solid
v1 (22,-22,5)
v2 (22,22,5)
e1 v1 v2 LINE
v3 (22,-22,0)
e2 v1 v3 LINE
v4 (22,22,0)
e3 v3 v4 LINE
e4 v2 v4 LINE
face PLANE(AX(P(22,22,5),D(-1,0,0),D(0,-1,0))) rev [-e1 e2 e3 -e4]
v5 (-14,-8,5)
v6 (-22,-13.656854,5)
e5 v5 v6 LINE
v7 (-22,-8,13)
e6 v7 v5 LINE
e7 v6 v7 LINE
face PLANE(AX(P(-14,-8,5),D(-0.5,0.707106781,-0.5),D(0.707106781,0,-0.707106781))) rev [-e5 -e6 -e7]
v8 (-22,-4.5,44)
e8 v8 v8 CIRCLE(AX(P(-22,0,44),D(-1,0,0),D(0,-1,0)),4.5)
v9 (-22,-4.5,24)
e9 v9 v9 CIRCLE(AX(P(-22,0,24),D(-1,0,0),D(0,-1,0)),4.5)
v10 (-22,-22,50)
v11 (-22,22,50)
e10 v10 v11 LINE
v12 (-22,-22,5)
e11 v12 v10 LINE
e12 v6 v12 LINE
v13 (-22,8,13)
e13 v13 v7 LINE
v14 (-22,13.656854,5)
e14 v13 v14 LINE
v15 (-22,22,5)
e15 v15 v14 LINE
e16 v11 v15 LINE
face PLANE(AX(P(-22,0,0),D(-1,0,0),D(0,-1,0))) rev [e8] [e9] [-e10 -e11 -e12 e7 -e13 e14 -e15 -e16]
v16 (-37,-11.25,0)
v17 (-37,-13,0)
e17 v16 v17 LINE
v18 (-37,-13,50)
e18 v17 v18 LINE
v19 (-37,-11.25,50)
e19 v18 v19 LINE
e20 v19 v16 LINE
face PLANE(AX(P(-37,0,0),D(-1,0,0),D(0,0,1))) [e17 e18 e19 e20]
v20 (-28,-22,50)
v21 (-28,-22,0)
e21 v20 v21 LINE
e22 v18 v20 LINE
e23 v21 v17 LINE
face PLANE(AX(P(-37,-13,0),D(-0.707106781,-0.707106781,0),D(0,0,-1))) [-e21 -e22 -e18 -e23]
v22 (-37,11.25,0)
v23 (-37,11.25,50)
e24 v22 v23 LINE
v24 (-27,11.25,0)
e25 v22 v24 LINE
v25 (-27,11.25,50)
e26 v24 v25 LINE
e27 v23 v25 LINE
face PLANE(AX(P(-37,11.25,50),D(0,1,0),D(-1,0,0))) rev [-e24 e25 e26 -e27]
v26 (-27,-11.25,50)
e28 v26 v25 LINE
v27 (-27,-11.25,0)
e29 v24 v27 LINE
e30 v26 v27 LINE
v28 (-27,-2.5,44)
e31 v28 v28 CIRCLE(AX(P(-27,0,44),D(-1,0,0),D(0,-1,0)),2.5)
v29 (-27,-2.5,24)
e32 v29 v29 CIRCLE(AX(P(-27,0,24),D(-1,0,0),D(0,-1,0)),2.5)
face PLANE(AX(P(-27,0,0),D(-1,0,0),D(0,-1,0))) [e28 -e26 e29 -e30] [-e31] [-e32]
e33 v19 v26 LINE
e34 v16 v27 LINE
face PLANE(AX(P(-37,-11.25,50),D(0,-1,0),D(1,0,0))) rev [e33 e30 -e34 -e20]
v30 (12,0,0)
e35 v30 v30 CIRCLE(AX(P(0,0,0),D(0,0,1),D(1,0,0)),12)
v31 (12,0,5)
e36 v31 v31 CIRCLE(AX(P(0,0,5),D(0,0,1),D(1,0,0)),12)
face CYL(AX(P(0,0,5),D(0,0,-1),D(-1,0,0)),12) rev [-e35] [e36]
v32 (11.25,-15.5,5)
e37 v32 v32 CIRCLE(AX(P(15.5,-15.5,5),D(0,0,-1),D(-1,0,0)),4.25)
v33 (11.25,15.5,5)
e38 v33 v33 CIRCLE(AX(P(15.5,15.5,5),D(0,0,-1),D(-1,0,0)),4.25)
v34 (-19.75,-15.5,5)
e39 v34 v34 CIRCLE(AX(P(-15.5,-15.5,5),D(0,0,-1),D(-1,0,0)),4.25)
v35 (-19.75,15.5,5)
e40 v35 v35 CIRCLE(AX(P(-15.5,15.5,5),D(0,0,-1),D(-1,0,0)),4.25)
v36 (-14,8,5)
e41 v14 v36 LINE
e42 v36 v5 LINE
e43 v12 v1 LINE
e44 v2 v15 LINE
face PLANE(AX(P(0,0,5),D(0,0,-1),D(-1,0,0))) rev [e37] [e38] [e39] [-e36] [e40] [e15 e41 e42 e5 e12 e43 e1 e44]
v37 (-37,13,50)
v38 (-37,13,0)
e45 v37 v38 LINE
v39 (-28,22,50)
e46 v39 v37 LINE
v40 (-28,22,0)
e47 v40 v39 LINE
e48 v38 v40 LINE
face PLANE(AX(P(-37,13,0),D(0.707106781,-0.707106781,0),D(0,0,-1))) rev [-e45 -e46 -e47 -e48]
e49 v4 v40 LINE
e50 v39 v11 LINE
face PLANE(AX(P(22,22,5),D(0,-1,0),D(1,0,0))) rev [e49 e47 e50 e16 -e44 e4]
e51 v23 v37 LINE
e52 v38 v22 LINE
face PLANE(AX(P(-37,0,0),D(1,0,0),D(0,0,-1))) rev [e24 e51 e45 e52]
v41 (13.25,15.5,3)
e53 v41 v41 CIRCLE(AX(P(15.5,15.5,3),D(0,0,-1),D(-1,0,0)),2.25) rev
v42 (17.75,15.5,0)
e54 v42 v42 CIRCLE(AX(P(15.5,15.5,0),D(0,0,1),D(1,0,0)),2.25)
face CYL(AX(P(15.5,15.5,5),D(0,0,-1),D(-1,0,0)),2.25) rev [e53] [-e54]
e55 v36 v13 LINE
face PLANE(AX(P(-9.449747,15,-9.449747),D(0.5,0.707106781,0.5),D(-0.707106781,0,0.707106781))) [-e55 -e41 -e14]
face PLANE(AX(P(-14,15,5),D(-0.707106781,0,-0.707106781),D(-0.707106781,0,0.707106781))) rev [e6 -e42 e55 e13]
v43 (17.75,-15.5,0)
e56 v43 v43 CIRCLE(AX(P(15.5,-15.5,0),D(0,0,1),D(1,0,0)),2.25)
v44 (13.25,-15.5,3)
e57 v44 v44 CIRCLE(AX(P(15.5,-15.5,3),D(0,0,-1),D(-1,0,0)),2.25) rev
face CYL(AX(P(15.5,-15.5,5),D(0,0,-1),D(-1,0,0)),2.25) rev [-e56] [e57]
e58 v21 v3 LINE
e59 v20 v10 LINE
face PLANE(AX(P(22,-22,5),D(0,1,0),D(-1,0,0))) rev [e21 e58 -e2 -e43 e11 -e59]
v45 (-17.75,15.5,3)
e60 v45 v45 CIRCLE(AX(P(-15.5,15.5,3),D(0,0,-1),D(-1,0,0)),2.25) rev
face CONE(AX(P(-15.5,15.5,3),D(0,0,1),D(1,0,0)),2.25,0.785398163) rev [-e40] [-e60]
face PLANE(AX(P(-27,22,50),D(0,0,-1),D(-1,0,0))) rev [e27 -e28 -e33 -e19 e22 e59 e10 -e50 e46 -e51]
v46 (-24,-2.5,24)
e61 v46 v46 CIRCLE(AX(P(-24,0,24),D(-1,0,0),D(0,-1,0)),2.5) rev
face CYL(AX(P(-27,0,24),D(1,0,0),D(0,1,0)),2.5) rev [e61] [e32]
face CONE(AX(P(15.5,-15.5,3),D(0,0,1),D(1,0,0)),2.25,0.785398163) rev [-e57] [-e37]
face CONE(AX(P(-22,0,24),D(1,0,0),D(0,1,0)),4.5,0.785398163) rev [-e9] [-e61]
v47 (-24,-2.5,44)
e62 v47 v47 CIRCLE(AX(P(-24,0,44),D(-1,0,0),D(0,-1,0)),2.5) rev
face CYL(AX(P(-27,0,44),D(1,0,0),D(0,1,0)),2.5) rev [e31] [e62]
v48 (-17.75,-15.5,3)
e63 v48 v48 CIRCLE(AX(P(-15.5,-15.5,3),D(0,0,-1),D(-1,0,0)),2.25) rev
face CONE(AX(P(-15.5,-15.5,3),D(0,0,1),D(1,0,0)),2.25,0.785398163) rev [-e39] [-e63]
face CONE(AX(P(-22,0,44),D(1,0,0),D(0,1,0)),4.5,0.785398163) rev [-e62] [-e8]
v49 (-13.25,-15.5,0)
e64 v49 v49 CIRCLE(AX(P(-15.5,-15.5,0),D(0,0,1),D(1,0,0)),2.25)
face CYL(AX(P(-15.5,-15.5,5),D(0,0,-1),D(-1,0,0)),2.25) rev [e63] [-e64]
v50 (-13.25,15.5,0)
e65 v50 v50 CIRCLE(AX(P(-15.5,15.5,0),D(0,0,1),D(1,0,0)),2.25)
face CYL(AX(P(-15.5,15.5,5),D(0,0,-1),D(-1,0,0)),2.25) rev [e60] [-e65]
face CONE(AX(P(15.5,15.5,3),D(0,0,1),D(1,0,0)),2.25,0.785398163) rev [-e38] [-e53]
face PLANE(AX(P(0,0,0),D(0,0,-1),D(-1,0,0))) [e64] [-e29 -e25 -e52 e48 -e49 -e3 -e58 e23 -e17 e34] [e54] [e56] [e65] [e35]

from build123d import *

# Parameters (mm, degrees)
SKETCH1_W           = 44
SKETCH1_H           = 44
SKETCH1_R           = 2.25
SKETCH1_R_2         = 12
BOSS_EXTRUDE1_DEPTH = 5
SKETCH2_W           = 50
SKETCH2_H           = 44
SKETCH2_R           = 2.5
BOSS_EXTRUDE2_DEPTH = 5
BOSS_EXTRUDE3_DEPTH = 15
CHAMFER1_SIZE       = 7
CHAMFER2_SIZE       = 2
SKETCH4_W           = 50
SKETCH4_H           = 10.75
BOSS_EXTRUDE4_DEPTH = 10
CHAMFER3_SIZE       = 9
CHAMFER4_SIZE       = 2


with BuildPart() as part:
    # Sketch1 → Boss-Extrude1 (new body)
    with BuildSketch(Plane.XY):
        Rectangle(SKETCH1_W, SKETCH1_H)
        with Locations((15.5, 15.5)):
            Circle(SKETCH1_R, mode=Mode.SUBTRACT)
        with Locations((15.5, -15.5)):
            Circle(SKETCH1_R, mode=Mode.SUBTRACT)
        with Locations((-15.5, -15.5)):
            Circle(SKETCH1_R, mode=Mode.SUBTRACT)
        with Locations((-15.5, 15.5)):
            Circle(SKETCH1_R, mode=Mode.SUBTRACT)
        Circle(SKETCH1_R_2, mode=Mode.SUBTRACT)
    extrude(amount=BOSS_EXTRUDE1_DEPTH)

    # Sketch2 → Boss-Extrude2 (add)
    with BuildSketch(Plane.ZY.offset(22)):
        with Locations((25, 0)):
            Rectangle(SKETCH2_W, SKETCH2_H)
        with Locations(Location((44, 0, 0), (0, 0, 270))):
            Circle(SKETCH2_R, mode=Mode.SUBTRACT)
        with Locations(Location((24, 0, 0), (0, 0, 270))):
            Circle(SKETCH2_R, mode=Mode.SUBTRACT)
    extrude(amount=BOSS_EXTRUDE2_DEPTH)

    # Sketch3 → Boss-Extrude3 (add, symmetric)
    with BuildSketch(Plane(origin=(0, 0, 0), x_dir=(1, 0, 0), z_dir=(0, 1, 0))):
        Polygon((-14, -5), (-22, -13), (-22, -5), align=None)
    extrude(amount=BOSS_EXTRUDE3_DEPTH, both=True)

    # Chamfer1
    # the kernel refuses this chamfer: 7 mm, written as the material it takes off along each edge
    with BuildSketch(Plane(origin=(-1.270818641, -15, -7.729181359), x_dir=(-0.7068394360706735, -0.02749587661058637, -0.7068394360706736), z_dir=(-0.7071067811865477, 0, 0.7071067811865475))) as chamfer1_piece_1_section:
        Polygon((CHAMFER1_SIZE * 0.999621916911, -CHAMFER1_SIZE * 0.0274958766106), (-CHAMFER1_SIZE * 0.0274958766106, -CHAMFER1_SIZE * 0.999621916911), (0, 0), align=None)
    chamfer1_piece_1 = extrude(amount=47.317270331, mode=Mode.PRIVATE)
    chamfer1_piece_1 = split(chamfer1_piece_1, bisect_by=Plane(origin=(-22, -12.156184448, 8.014329888), z_dir=(1, 0, 0)), keep=Keep.TOP, mode=Mode.PRIVATE)
    chamfer1_piece_1 = split(chamfer1_piece_1, bisect_by=Plane(origin=(-19.249817179, -12.156184448, 5), z_dir=(0, 0, 1)), keep=Keep.TOP, mode=Mode.PRIVATE)
    add(chamfer1_piece_1, mode=Mode.SUBTRACT)
    with BuildSketch(Plane(origin=(-1.270818641, 15, -7.729181359), x_dir=(0.019442520806014066, -0.9996219169112968, 0.019442520806014073), z_dir=(-0.7071067811865477, 0, 0.7071067811865475))) as chamfer1_piece_2_section:
        Polygon((CHAMFER1_SIZE * 0.999621916911, -CHAMFER1_SIZE * 0.0274958766106), (-CHAMFER1_SIZE * 0.0274958766106, -CHAMFER1_SIZE * 0.999621916911), (0, 0), align=None)
    chamfer1_piece_2 = extrude(amount=47.317270331, mode=Mode.PRIVATE)
    chamfer1_piece_2 = split(chamfer1_piece_2, bisect_by=Plane(origin=(-22, 12.156184448, 8.014329888), z_dir=(1, 0, 0)), keep=Keep.TOP, mode=Mode.PRIVATE)
    chamfer1_piece_2 = split(chamfer1_piece_2, bisect_by=Plane(origin=(-19.249817179, 12.156184448, 5), z_dir=(0, 0, 1)), keep=Keep.TOP, mode=Mode.PRIVATE)
    add(chamfer1_piece_2, mode=Mode.SUBTRACT)

    # Chamfer2
    chamfer2_edges = [part.edges().sort_by_distance(p)[0] for p in [
        (-22, 2.5, 44),
        (-22, 2.5, 24),
    ]]
    chamfer(chamfer2_edges, length=CHAMFER2_SIZE)

    # Sketch4 → Boss-Extrude4 (add)
    with BuildSketch(Plane.ZY.offset(27)):
        with Locations((25, 16.625)):
            Rectangle(SKETCH4_W, SKETCH4_H)
        with Locations((25, -16.625)):
            Rectangle(SKETCH4_W, SKETCH4_H)
    extrude(amount=BOSS_EXTRUDE4_DEPTH)

    # Chamfer3
    chamfer3_edges = [part.edges().sort_by_distance(p)[0] for p in [
        (-37, -22, 25),
        (-37, 22, 25),
    ]]
    chamfer(chamfer3_edges, length=CHAMFER3_SIZE)

    # Chamfer4
    chamfer4_edges = [part.edges().sort_by_distance(p)[0] for p in [
        (13.25, 15.5, 5),
        (13.25, -15.5, 5),
        (-17.75, 15.5, 5),
        (-17.75, -15.5, 5),
    ]]
    chamfer(chamfer4_edges, length=CHAMFER4_SIZE)


solid = part.part
